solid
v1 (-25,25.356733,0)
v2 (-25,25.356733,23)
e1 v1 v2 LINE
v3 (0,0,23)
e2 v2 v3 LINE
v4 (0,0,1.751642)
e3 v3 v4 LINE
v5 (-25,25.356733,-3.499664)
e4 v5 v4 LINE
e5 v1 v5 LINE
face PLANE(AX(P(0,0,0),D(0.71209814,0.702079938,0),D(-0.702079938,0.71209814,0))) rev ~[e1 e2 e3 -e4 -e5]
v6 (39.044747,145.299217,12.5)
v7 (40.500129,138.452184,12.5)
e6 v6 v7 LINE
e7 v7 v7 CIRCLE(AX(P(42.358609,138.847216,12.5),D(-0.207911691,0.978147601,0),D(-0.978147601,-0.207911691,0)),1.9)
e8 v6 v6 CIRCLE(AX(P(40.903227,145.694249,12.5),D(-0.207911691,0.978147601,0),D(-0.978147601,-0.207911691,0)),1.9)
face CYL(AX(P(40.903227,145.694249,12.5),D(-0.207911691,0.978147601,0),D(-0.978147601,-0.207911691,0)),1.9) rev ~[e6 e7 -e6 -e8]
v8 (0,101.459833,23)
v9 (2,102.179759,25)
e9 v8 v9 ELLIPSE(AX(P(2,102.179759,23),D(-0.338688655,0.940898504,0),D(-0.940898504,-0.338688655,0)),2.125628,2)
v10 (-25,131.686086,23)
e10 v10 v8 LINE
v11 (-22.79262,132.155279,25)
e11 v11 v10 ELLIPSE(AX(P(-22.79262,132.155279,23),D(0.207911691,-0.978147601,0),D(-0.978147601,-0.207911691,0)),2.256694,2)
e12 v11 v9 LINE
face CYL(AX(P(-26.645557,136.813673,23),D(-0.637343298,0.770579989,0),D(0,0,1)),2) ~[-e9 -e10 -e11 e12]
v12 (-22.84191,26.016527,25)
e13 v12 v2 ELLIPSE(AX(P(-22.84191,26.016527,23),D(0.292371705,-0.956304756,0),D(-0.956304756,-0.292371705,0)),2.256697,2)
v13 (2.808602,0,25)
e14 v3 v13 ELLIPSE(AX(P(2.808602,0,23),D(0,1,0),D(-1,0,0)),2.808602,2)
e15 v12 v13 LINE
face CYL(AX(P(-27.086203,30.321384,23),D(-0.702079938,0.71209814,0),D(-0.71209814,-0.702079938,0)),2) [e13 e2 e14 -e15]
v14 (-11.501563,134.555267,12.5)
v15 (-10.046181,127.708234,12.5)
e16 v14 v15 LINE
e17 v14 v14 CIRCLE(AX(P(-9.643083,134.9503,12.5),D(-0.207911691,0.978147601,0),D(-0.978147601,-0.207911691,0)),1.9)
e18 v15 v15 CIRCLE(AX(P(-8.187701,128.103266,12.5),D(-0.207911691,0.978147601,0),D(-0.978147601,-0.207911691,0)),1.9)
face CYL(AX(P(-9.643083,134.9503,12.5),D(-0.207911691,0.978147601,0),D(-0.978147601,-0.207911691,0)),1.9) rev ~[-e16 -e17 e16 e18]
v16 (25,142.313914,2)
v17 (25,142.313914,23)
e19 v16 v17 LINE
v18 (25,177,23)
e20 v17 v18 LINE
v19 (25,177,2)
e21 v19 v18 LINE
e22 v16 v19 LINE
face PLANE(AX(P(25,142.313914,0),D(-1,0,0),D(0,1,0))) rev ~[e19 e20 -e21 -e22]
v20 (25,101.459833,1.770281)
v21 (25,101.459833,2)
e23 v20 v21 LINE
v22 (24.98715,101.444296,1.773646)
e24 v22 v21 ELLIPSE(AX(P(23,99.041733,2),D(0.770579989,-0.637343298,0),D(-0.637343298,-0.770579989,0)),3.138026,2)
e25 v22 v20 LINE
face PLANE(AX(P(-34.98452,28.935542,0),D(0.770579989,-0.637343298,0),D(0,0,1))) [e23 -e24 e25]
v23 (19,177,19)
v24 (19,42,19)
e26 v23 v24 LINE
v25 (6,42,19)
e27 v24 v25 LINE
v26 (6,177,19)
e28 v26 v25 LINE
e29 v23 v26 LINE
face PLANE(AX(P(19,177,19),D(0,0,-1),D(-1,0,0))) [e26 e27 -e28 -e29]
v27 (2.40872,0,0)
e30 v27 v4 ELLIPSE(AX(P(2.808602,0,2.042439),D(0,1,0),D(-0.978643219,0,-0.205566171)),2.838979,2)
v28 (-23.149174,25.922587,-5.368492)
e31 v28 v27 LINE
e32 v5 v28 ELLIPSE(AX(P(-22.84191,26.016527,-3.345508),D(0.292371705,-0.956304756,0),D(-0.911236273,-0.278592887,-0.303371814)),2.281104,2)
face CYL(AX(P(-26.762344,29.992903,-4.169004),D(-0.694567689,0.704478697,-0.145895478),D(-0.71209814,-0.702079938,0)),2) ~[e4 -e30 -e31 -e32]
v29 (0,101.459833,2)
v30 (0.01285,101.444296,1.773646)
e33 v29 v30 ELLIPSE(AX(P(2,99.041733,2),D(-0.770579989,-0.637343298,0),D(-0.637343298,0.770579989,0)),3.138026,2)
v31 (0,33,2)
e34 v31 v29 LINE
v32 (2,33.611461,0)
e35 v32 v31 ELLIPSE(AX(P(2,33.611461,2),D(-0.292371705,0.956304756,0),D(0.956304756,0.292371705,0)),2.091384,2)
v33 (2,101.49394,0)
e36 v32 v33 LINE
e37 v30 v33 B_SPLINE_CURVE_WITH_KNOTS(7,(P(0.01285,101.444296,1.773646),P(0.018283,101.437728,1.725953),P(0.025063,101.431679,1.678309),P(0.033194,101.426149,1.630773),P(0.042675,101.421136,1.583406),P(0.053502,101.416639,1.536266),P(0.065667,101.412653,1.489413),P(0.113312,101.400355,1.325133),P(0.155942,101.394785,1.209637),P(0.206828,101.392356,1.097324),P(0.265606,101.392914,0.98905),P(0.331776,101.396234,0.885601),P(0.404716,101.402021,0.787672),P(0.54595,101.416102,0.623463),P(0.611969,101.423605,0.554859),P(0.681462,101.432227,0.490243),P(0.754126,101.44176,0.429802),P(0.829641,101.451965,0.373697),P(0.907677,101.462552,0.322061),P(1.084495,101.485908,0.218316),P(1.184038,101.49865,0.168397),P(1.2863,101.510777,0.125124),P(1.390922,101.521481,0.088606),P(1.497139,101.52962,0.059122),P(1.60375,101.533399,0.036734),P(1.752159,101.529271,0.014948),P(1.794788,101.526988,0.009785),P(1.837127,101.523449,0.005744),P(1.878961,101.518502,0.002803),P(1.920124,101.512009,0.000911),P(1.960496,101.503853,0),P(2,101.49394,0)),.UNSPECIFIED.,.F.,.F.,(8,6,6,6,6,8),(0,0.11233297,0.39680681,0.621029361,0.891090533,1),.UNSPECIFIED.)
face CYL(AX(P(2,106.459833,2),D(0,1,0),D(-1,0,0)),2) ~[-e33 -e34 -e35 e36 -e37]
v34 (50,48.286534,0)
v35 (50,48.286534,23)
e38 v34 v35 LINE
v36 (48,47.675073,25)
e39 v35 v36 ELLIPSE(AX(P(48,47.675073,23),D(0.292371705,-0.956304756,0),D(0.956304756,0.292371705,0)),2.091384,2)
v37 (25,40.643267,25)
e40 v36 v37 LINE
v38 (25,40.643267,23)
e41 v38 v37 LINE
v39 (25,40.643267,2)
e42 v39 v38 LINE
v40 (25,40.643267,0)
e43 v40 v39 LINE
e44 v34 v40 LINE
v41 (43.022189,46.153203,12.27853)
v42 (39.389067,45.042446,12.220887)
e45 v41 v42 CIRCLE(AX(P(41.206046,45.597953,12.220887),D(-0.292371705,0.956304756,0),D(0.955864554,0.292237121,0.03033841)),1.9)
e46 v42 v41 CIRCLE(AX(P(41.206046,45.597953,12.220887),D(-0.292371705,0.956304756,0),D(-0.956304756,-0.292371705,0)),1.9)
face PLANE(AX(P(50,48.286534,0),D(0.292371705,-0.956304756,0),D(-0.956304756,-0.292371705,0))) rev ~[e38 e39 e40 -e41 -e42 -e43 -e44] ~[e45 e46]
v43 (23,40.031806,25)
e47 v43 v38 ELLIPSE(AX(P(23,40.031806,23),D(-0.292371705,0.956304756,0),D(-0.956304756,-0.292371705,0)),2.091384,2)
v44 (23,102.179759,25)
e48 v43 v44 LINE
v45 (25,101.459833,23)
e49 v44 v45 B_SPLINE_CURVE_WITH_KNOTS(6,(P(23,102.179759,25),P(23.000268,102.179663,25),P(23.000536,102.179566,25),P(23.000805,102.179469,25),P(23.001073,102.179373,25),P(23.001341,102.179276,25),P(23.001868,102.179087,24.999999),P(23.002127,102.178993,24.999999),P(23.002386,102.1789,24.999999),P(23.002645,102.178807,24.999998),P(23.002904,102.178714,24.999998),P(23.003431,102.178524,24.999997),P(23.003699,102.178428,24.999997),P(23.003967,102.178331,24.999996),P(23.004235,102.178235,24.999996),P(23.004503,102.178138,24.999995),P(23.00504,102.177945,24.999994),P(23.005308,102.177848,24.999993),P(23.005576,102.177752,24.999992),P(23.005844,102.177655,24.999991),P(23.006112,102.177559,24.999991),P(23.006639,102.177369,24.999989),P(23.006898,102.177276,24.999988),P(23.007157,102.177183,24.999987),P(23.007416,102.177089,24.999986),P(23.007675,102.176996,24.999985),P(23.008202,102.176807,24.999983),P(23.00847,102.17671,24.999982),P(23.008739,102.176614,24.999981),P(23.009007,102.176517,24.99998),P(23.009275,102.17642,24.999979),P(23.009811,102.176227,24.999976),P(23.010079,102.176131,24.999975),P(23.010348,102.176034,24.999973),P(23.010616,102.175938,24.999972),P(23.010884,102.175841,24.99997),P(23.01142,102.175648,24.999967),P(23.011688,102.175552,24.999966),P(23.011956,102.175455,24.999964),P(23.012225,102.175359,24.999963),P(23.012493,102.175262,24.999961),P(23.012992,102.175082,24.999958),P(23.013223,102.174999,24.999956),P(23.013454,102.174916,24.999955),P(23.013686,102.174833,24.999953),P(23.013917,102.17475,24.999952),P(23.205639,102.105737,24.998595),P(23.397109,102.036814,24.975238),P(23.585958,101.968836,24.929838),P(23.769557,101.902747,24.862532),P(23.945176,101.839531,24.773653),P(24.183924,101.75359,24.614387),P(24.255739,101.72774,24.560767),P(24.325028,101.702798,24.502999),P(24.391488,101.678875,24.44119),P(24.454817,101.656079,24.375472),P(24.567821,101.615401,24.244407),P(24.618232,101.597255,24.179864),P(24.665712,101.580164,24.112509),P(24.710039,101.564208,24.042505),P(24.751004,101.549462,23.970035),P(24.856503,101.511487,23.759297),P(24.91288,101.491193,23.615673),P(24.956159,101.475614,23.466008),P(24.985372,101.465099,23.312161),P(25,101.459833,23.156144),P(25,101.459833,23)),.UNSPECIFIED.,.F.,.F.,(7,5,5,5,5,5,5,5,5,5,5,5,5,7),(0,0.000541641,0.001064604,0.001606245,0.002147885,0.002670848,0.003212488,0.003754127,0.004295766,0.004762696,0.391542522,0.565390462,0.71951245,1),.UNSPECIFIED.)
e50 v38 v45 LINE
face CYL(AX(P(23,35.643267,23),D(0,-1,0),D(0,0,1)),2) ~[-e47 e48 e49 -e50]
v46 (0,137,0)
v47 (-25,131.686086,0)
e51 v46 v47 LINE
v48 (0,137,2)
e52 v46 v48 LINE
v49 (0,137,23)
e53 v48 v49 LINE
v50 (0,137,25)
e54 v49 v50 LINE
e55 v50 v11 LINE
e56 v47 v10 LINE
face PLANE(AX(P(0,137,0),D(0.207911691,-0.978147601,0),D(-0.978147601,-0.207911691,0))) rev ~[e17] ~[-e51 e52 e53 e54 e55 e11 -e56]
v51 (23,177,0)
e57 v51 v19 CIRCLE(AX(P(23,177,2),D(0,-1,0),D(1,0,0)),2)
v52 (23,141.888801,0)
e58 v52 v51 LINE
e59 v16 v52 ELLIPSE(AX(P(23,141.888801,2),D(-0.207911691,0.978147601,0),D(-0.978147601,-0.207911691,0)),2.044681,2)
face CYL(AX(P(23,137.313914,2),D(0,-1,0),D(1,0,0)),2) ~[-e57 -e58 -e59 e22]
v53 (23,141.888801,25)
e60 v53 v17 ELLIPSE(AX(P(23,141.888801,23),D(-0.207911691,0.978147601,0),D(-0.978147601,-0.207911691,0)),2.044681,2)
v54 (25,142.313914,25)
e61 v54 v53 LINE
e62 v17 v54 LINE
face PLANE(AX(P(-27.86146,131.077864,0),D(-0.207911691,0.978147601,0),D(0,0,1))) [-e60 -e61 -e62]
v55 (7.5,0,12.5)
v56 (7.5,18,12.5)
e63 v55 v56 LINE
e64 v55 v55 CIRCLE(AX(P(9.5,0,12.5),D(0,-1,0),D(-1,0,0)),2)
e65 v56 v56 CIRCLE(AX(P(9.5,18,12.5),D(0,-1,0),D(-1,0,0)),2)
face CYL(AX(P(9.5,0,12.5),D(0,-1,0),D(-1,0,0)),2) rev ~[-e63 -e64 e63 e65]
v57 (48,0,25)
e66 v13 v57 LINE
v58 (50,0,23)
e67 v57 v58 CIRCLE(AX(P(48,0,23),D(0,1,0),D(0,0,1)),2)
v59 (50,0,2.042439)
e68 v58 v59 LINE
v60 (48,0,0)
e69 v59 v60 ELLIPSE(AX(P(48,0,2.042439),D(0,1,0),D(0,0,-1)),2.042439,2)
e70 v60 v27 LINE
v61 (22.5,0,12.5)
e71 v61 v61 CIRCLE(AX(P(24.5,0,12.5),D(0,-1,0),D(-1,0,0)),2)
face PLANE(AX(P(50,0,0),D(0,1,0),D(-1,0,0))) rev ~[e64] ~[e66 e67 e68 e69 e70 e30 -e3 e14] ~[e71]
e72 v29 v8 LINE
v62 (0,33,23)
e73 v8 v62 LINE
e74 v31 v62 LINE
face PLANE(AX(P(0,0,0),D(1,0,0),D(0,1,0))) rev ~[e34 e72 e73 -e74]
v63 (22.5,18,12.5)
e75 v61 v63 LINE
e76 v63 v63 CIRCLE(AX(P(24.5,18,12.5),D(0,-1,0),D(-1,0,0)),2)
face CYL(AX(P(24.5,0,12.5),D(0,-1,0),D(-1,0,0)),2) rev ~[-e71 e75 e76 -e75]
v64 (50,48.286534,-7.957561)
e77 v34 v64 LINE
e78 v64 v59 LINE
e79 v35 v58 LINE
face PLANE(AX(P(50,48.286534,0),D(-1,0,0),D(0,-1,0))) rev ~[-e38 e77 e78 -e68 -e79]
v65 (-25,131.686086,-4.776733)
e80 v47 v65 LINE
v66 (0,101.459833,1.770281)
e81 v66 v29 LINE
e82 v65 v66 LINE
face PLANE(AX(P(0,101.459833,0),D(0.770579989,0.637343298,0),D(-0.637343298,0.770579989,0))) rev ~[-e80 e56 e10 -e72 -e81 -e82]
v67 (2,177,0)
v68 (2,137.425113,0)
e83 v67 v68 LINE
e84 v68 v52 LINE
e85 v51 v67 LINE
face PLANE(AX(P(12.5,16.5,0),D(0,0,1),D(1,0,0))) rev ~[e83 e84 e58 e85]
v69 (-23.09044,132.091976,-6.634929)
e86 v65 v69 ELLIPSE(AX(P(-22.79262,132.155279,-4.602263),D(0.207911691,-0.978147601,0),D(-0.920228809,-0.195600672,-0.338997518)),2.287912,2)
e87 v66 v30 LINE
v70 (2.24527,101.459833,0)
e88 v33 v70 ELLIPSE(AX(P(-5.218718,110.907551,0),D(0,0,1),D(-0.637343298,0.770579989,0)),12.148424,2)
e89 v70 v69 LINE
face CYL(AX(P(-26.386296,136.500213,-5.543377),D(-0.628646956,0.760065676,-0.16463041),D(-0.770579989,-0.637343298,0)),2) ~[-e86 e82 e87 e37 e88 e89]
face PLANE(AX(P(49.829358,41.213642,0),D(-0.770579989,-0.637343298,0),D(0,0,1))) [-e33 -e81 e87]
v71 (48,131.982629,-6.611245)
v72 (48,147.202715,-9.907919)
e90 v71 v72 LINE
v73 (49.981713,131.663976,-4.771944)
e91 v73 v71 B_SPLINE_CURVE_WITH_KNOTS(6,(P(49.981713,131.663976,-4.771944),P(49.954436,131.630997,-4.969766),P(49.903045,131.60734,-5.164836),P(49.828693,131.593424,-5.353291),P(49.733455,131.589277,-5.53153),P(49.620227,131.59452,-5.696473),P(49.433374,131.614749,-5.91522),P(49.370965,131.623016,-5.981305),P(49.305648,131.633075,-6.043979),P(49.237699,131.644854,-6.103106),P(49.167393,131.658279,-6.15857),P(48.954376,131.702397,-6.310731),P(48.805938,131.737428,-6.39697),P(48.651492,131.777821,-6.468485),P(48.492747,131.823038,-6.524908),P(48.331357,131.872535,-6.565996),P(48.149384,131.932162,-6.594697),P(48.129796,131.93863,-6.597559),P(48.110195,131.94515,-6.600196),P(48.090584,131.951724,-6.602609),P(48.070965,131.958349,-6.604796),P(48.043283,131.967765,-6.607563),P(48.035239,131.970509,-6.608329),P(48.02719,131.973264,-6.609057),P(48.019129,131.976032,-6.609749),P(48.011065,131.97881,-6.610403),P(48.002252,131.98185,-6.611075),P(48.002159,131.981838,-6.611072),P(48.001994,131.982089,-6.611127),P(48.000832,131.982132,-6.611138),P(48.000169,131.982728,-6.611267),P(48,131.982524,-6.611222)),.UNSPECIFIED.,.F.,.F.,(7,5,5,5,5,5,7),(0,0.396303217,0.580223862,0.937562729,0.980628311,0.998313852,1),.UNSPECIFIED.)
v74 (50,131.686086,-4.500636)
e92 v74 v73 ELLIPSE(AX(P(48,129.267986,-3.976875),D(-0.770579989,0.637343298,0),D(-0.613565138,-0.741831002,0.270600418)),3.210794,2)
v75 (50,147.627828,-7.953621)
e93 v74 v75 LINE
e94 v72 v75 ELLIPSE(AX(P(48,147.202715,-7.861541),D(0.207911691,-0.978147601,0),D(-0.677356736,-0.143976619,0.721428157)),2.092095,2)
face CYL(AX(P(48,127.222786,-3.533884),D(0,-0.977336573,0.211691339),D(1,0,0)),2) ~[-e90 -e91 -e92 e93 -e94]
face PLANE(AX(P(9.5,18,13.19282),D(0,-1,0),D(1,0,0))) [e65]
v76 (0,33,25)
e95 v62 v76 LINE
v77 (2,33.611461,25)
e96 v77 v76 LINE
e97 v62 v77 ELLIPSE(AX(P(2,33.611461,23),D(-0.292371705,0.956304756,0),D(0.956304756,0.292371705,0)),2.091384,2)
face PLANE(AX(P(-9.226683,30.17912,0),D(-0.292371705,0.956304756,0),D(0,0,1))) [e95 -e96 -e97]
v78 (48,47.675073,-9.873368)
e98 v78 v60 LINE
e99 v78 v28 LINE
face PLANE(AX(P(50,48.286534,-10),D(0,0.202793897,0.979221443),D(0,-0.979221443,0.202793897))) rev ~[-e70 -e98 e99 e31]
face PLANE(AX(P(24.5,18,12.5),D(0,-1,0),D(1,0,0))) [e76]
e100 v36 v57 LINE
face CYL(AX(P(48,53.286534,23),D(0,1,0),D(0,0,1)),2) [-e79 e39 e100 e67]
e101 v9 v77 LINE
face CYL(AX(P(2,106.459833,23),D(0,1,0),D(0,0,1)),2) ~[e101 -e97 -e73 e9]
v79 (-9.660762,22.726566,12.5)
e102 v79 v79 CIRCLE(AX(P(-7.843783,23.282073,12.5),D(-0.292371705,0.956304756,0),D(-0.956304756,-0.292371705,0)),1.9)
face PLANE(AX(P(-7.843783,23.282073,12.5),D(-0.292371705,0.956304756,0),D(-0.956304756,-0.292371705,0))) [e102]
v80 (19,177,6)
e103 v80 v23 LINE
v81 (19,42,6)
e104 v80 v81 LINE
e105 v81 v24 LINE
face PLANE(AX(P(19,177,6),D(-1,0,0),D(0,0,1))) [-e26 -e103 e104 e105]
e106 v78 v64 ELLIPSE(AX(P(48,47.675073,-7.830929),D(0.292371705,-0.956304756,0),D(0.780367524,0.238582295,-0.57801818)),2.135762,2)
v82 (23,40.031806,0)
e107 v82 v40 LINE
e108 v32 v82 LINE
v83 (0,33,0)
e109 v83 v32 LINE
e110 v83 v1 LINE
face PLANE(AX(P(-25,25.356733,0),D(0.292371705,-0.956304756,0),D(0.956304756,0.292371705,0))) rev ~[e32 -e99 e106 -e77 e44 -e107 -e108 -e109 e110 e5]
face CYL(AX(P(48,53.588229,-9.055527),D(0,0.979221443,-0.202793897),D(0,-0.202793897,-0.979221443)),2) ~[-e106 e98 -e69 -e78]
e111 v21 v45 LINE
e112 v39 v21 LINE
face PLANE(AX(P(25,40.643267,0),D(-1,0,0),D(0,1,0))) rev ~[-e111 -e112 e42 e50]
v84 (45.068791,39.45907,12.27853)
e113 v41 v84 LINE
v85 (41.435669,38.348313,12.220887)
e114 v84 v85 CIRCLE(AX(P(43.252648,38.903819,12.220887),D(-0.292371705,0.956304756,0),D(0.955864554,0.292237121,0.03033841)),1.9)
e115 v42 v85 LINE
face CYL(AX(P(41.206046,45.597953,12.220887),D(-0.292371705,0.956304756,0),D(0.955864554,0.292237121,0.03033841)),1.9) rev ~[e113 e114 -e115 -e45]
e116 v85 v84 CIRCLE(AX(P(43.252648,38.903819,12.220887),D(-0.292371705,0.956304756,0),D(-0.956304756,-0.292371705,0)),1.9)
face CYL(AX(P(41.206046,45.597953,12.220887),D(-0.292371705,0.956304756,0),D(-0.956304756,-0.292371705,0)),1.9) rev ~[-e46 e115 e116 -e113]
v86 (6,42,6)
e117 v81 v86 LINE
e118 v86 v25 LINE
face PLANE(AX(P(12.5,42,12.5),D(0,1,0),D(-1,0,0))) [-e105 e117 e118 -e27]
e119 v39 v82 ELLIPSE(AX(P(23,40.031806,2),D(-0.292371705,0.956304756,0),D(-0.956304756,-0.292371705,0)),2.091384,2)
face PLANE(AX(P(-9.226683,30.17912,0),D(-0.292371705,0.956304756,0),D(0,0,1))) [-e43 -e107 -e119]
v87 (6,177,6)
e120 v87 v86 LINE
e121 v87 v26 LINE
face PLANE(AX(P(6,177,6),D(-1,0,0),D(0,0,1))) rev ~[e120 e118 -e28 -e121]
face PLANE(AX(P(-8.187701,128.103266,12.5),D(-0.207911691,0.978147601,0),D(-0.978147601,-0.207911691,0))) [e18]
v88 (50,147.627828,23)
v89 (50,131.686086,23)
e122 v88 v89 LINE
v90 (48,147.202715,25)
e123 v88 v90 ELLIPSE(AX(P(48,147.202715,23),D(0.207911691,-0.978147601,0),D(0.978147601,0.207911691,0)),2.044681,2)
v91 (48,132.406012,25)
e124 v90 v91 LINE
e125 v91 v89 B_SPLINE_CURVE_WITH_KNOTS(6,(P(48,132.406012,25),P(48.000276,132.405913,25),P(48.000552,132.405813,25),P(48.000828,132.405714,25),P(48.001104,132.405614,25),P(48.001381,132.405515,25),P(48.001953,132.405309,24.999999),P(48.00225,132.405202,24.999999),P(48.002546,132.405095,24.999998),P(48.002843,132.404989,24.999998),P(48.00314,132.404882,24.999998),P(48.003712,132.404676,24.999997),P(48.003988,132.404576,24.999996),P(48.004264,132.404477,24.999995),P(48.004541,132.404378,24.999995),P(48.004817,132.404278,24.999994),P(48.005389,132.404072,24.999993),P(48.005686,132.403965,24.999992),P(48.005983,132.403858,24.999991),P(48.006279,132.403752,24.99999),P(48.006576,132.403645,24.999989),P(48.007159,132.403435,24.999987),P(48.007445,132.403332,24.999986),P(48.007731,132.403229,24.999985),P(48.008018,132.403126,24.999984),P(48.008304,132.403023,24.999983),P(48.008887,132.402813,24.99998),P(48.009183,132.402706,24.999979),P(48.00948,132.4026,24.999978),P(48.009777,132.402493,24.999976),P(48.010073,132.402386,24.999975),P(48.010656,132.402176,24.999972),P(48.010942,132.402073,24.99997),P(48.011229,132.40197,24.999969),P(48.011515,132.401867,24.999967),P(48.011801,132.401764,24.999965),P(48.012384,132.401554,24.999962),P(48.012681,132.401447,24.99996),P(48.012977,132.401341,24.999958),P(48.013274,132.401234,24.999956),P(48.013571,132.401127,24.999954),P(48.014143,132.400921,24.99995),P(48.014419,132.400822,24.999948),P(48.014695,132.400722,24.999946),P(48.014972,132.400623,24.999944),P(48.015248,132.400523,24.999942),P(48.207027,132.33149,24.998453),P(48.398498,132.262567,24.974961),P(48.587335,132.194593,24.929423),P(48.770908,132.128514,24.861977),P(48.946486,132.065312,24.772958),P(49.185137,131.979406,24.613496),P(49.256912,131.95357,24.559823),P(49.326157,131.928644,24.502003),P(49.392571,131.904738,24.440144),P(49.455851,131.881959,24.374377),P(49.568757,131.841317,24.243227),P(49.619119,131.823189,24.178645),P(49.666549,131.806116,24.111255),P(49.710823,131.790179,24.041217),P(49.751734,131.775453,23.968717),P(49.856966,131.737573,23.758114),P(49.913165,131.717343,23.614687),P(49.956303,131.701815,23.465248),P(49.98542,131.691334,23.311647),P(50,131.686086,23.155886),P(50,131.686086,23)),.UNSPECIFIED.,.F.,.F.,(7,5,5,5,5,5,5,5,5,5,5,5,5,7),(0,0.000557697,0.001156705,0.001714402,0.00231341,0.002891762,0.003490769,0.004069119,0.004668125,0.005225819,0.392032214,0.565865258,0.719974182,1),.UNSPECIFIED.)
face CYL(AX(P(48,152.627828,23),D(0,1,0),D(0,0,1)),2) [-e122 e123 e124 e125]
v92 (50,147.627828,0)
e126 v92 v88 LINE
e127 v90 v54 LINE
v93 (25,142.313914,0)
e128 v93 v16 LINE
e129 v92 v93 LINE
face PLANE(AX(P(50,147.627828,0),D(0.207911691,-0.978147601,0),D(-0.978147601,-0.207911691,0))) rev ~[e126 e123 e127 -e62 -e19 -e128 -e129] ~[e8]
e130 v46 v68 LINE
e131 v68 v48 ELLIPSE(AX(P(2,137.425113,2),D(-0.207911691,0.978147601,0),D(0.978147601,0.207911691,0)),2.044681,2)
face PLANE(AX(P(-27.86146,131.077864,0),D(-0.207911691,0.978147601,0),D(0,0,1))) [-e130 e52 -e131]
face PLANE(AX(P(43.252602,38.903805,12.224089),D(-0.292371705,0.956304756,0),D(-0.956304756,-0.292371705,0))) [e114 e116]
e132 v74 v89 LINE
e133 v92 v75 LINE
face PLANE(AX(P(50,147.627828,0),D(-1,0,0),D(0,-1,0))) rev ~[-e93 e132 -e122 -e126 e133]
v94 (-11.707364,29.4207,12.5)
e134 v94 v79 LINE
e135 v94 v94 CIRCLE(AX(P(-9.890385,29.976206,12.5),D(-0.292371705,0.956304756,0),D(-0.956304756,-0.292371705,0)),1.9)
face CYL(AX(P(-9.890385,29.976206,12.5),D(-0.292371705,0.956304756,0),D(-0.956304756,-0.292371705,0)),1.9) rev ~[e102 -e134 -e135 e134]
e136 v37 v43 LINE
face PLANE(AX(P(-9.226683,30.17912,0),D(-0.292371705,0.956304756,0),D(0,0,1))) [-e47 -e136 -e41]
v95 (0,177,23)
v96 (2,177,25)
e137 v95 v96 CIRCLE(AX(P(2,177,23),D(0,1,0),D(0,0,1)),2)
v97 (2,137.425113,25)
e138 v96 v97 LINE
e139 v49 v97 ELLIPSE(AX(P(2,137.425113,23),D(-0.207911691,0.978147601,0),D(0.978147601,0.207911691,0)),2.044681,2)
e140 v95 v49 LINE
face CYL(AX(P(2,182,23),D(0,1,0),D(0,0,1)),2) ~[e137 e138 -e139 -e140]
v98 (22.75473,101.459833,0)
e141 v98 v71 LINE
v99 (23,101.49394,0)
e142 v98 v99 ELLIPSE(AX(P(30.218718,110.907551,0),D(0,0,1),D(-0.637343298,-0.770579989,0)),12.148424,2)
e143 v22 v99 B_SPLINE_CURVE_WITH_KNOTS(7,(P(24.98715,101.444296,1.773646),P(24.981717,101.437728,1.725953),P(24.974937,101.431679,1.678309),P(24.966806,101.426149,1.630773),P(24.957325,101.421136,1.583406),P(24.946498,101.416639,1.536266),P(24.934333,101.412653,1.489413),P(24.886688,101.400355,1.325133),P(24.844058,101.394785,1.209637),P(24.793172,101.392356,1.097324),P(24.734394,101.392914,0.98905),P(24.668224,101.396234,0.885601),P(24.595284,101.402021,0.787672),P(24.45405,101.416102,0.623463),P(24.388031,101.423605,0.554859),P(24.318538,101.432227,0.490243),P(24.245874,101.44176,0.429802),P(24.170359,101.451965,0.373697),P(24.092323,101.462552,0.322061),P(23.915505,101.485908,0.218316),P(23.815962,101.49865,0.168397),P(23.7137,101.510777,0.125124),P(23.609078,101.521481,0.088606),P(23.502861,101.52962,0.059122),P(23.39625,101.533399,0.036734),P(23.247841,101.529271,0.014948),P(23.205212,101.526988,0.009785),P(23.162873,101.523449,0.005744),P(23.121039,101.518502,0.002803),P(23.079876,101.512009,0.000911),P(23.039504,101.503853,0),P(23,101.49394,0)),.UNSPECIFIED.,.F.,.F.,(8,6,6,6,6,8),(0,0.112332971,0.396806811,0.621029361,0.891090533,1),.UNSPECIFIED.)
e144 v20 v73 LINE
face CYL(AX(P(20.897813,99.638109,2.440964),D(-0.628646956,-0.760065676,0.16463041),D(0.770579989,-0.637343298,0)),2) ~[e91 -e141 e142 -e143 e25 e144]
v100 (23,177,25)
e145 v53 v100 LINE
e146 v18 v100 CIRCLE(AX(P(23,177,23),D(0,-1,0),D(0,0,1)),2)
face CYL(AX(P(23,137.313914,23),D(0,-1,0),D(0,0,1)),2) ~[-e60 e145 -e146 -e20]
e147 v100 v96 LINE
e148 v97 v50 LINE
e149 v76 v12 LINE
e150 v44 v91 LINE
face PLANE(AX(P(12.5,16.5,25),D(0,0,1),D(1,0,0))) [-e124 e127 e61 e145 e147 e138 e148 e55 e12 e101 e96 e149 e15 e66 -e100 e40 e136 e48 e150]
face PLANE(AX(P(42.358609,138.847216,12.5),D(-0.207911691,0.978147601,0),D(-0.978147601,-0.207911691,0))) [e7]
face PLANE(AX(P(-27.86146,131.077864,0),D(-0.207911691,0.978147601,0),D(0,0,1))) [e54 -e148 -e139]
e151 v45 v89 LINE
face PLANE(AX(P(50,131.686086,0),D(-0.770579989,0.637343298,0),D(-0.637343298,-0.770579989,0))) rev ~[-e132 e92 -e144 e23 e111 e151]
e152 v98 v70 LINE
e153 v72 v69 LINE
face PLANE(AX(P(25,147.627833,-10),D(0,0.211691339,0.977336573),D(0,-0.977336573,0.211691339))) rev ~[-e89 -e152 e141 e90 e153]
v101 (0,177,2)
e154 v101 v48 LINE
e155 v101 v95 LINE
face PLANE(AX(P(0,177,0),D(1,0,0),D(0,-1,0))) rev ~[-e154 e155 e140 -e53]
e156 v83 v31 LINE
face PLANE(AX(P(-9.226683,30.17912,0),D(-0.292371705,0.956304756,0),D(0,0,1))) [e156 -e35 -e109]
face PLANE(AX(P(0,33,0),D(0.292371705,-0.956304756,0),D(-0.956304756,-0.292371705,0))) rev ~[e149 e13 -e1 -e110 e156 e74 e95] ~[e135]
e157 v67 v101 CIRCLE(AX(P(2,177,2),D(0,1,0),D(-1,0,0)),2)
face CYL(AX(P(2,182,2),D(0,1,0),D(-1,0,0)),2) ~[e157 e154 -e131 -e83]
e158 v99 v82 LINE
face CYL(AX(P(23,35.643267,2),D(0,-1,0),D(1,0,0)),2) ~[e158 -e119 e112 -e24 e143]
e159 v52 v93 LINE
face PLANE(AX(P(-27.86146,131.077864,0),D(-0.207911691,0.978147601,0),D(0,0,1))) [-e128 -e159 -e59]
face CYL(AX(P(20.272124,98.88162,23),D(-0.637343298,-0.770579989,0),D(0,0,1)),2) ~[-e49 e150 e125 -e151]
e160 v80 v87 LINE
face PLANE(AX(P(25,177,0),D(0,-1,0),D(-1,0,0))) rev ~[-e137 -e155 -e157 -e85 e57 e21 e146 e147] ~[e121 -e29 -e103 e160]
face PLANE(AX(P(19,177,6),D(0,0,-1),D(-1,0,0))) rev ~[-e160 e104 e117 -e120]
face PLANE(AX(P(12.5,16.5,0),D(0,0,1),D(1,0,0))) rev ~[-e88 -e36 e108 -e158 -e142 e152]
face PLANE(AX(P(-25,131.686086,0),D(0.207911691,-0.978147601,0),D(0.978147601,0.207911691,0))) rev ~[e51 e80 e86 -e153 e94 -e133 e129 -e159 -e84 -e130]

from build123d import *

# Parameters (mm, degrees)
F0_W           = 25
F0_H           = 33
F1_DEPTH       = 25
F3_DEPTH       = 10
F5_DEPTH       = 81.7
F7_DEPTH       = 10
F9_DEPTH       = 92
F10_W          = 13
F10_H          = 13
F11_DEPTH      = 135
F12_R          = 1.9
F13_DEPTH      = 7
F14_R          = 1.9
F15_DEPTH      = 7
F17_DEPTH      = 18
F18_T1_DEPTH   = 26.3114146799
F18_T3_DEPTH   = 25.9417421253
F18_T5_DEPTH   = 59.3111485648
F18_T7_DEPTH   = 58.2865340729
F18_T9_DEPTH   = 45.6084808239
F18_T11_DEPTH  = 44.6581070284
F18_T16_DEPTH  = 49.2253281189
F18_T21_DEPTH  = 48.4985768834
F18_T27_DEPTH  = 48.4985768834
F18_T33_DEPTH  = 48.4985768834
F18_T39_DEPTH  = 48.4985768834
F18_T45_DEPTH  = 48.4985768834
F18_T51_DEPTH  = 48.4985768834
F18_T57_DEPTH  = 49.2253281189
F18_T62_DEPTH  = 70.8165659944
F18_T69_DEPTH  = 70.8165659944
F18_T75_DEPTH  = 70.8165659944
F18_T81_DEPTH  = 70.8165659944
F18_T87_DEPTH  = 78.4598330308
F18_T93_DEPTH  = 78.4598330308
F18_T99_DEPTH  = 78.4598330308
F18_T106_DEPTH = 78.4598330308
F18_T112_DEPTH = 50
F18_T117_DEPTH = 50
F18_T122_DEPTH = 44.6860859582
F18_T127_DEPTH = 44.6860859582
F18_T133_DEPTH = 70.8165659944
F18_T137_DEPTH = 49.2253281189
F18_T144_DEPTH = 70.8165659944
F18_T149_DEPTH = 48.4985768834
F18_T157_DEPTH = 48.4985768834
F18_T162_DEPTH = 78.4598330308
F18_T170_DEPTH = 49.2253281189
F18_T174_DEPTH = 78.4598330308


# Not quite as in the source:
# - a fillet or chamfer that OpenCascade refuses, or shapes differently, is made with other operations: its cross-section is extruded or revolved along the edge and cut away or added


with BuildPart() as f1:
    # F0 (on Top) → F1 (new body)
    with BuildSketch(Plane.XY):
        with Locations((12.5, 16.5)):
            Rectangle(F0_W, F0_H)
        Polygon((-25, 25.3567329635), (0, 0), (0, 33), align=None)
        with Locations((37.5, 16.5)):
            Rectangle(F0_W, F0_H)
        Polygon((25, 40.6432670365), (0, 33), (25, 33), align=None)
        Polygon((0, 101.4598330308), (0, 33), (25, 40.6432670365), (25, 101.4598330308), (25, 137), (0, 137), align=None)
        Polygon((25, 40.6432670365), (25, 33), (50, 33), (50, 48.2865340729), align=None)
        Polygon((-25, 131.6860859582), (0, 101.4598330308), (0, 137), align=None)
        Polygon((25, 137), (25, 101.4598330308), (50, 131.6860859582), (50, 147.6278280835), (25, 142.3139140418), align=None)
        Polygon((25, 142.3139140418), (0, 137), (25, 137), align=None)
        Polygon((0, 177), (0, 137), (25, 142.3139140418), (25, 177), align=None)
    extrude(amount=F1_DEPTH)

    # F2 (on face) → F3 (join)
    with BuildSketch(Plane(origin=(0, 0, 0), x_dir=(1, 0, 0), z_dir=(0, 0, -1))):
        Polygon((50, -131.6860859582), (25, -101.4598330308), (0, -101.4598330308), (-25, -131.6860859582), (50, -147.6278280835), align=None)
    extrude(amount=F3_DEPTH)

    # F4 (on face) → F5 (cut, symmetric)
    with BuildSketch(Plane.YZ.offset(25)):
        Polygon((101.4598330308, -21.1370438337), (147.6278330308, -10), (101.4598330308, 0), align=None)
    extrude(amount=F5_DEPTH, both=True, mode=Mode.SUBTRACT)

    # F6 (on face) → F7 (join)
    with BuildSketch(Plane(origin=(0, 0, 0), x_dir=(1, 0, 0), z_dir=(0, 0, -1))):
        Polygon((50, -48.2865340729), (50, 0), (0, 0), (-25, -25.3567329635), align=None)
    extrude(amount=F7_DEPTH)

    # F8 (on face) → F9 (cut)
    with BuildSketch(Plane.YZ.offset(50)):
        Polygon((48.2865340729, -10), (0, 0), (0, -39.534393698), (48.2865340729, -39.534393698), align=None)
    extrude(amount=-F9_DEPTH, mode=Mode.SUBTRACT)

    # F10 (on face) → F11 (cut)
    with BuildSketch(Plane(origin=(0, 177, 0), x_dir=(-1, 0, 0), z_dir=(0, 1, 0))):
        with Locations((-12.5, 12.5)):
            Rectangle(F10_W, F10_H)
    extrude(amount=-F11_DEPTH, mode=Mode.SUBTRACT)

    # F12 (on face) → F13 (cut)
    with BuildSketch(Plane(origin=(-27.8614600507, 131.0778638485, 0), x_dir=(-0.9781476007, -0.2079116908, 0), z_dir=(-0.2079116908, 0.9781476007, 0))):
        with Locations((-18.6253867704, 12.5)):
            Circle(F12_R)
        with BuildLine():
            ThreePointArc((-72.2009313853, 12.5), (-70.3009313853, 10.6), (-68.4009313853, 12.5))
            ThreePointArc((-68.4009313853, 12.5), (-70.3009313853, 14.4), (-72.2009313853, 12.5))
        make_face()
    extrude(amount=-F13_DEPTH, mode=Mode.SUBTRACT)

    # F14 (on face) → F15 (cut)
    with BuildSketch(Plane(origin=(-9.2266829073, 30.1791199472, 0), x_dir=(-0.956304756, -0.2923717047, 0), z_dir=(-0.2923717047, 0.956304756, 0))):
        with Locations((0.6940276563, 12.5)):
            Circle(F14_R)
        with BuildLine():
            ThreePointArc((-54.6362143833, 12.2785296088), (-52.7659137894, 10.3211052927), (-50.8370889828, 12.2208866302))
            ThreePointArc((-50.8370889828, 12.2208866302), (-52.7082641762, 14.1206679678), (-54.6362143833, 12.2785296088))
        make_face()
    extrude(amount=-F15_DEPTH, mode=Mode.SUBTRACT)

    # F16 (on face) → F17 (cut)
    with BuildSketch(Plane.XZ):
        with BuildLine():
            ThreePointArc((11.5, 12.5), (9.5, 14.5), (7.5, 12.5))
            Line((7.5, 12.5), (9.5, 12.5))
            Line((9.5, 12.5), (11.5, 12.5))
        make_face()
        with BuildLine():
            ThreePointArc((26.5, 12.5), (24.5, 14.5), (22.5, 12.5))
            ThreePointArc((22.5, 12.5), (24.5, 10.5), (26.5, 12.5))
        make_face()
        with BuildLine():
            Line((9.5, 12.5), (7.5, 12.5))
            ThreePointArc((7.5, 12.5), (9.5, 10.5), (11.5, 12.5))
            Line((11.5, 12.5), (9.5, 12.5))
        make_face()
    extrude(amount=-F17_DEPTH, mode=Mode.SUBTRACT)

    # F18: fillet of radius 2 on 18 edges, made by hand

    # F18_s2 → F18_t1 (cut)
    with BuildSketch(Plane(origin=(0, 122.2526609766, -26.4799560251), x_dir=(1, 0, 0), z_dir=(0, 0.9773365731, -0.2116913388))):
        with BuildLine():
            ThreePointArc((50, -23.478167891), (49.4142135624, -22.0639543286), (48, -21.478167891))
            Line((48, -21.478167891), (50, -21.478167891))
            Line((50, -21.478167891), (50, -23.478167891))
        make_face()
    extrude(amount=F18_T1_DEPTH, mode=Mode.SUBTRACT)

    # F18_s4 → F18_t3 (cut)
    with BuildSketch(Plane.XZ.offset(-152.6278280835)):
        with BuildLine():
            ThreePointArc((48, 25), (49.4142135624, 24.4142135624), (50, 23))
            Line((50, 23), (50, 25))
            Line((50, 25), (48, 25))
        make_face()
    extrude(amount=F18_T3_DEPTH, mode=Mode.SUBTRACT)

    # F18_s6 → F18_t5 (cut)
    with BuildSketch(Plane(origin=(0, 53.1826412899, -11.0139694867), x_dir=(1, 0, 0), z_dir=(0, -0.9792214434, 0.2027938973))):
        with BuildLine():
            ThreePointArc((48, 0), (49.4142135624, 0.5857864376), (50, 2))
            Line((50, 2), (50, 0))
            Line((50, 0), (48, 0))
        make_face()
    extrude(amount=F18_T5_DEPTH, mode=Mode.SUBTRACT)

    # F18_s8 → F18_t7 (cut)
    with BuildSketch(Plane.XZ.offset(-53.2865340729)):
        with BuildLine():
            ThreePointArc((48, 25), (49.4142135624, 24.4142135624), (50, 23))
            Line((50, 23), (50, 25))
            Line((50, 25), (48, 25))
        make_face()
    extrude(amount=F18_T7_DEPTH, mode=Mode.SUBTRACT)

    # F18_s10 → F18_t9 (cut)
    with BuildSketch(Plane(origin=(-28.5103996887, 28.9172236636, 0), x_dir=(0, 0, 1), z_dir=(0.7020799377, -0.71209814, 0))):
        with BuildLine():
            ThreePointArc((23, 0), (24.4142135624, -0.5857864376), (25, -2))
            Line((25, -2), (25, 0))
            Line((25, 0), (23, 0))
        make_face()
    extrude(amount=F18_T9_DEPTH, mode=Mode.SUBTRACT)

    # F18_s12 → F18_t11 (cut)
    with BuildSketch(Plane(origin=(-28.0090391043, 28.4087090053, -5.8833605581), x_dir=(0.71209814, 0.7020799377, 0), z_dir=(0.6945676893, -0.7044786969, 0.145895478))):
        with BuildLine():
            ThreePointArc((0, 1.7328989819), (0.4884593774, 0.4232253789), (1.7152449464, -0.2467258713))
            Line((1.7152449464, -0.2467258713), (0, 0))
            Line((0, 0), (0, 1.7328989819))
        make_face()
    extrude(amount=F18_T11_DEPTH, mode=Mode.SUBTRACT)


with BuildPart() as f18_tool14:
    # F18_s15 → F18_t16 (new body)
    with BuildSketch(Plane(origin=(56.7978037382, 68.6713912604, 0), x_dir=(0, 0, 1), z_dir=(0.6373432983, 0.7705799894, 0))):
        with BuildLine():
            ThreePointArc((25, -47.4002448925), (24.4142135624, -45.9860313302), (23, -45.4002448925))
            Line((23, -45.4002448925), (25, -45.4002448925))
            Line((25, -45.4002448925), (25, -47.4002448925))
        make_face()
    extrude(amount=F18_T16_DEPTH)

    split(bisect_by=Plane.YZ.offset(25), keep=Keep.TOP)


with BuildPart() as f1_1:
    add(f1.part)

    # F18_t13: cut F18_tool14
    add(f18_tool14.part, mode=Mode.SUBTRACT)


with BuildPart() as f18_tool19:
    # F18_s20 → F18_t21 (new body)
    with BuildSketch(Plane(origin=(55.6145080943, 67.2407275237, -14.5643578937), x_dir=(-0.7705799894, 0.6373432983, 0), z_dir=(0.6286469564, 0.7600656763, -0.1646304099))):
        with BuildLine():
            ThreePointArc((45.4002448925, 17.2405635017), (45.8936460368, 15.9252080791), (47.1304047803, 15.258850527))
            Line((47.1304047803, 15.258850527), (45.4002448925, 15.4944378922))
            Line((45.4002448925, 15.4944378922), (45.4002448925, 17.2405635017))
        make_face()
    extrude(amount=F18_T21_DEPTH)

    split(bisect_by=Plane.YZ.offset(25), keep=Keep.BOTTOM)

    split(bisect_by=Plane.XY, keep=Keep.BOTTOM)


with BuildPart() as f1_2:
    add(f1_1.part)

    # F18_t18: cut F18_tool19
    add(f18_tool19.part, mode=Mode.SUBTRACT)


with BuildPart() as f18_tool25:
    # F18_s26 → F18_t27 (new body)
    with BuildSketch(Plane(origin=(55.6145080943, 67.2407275237, -14.5643578937), x_dir=(-0.7705799894, 0.6373432983, 0), z_dir=(0.6286469564, 0.7600656763, -0.1646304099))):
        with BuildLine():
            ThreePointArc((45.4002448925, 17.2405635017), (45.8936460368, 15.9252080791), (47.1304047803, 15.258850527))
            Line((47.1304047803, 15.258850527), (45.4002448925, 15.4944378922))
            Line((45.4002448925, 15.4944378922), (45.4002448925, 17.2405635017))
        make_face()
    extrude(amount=F18_T27_DEPTH)

    split(bisect_by=Plane.YZ.offset(25), keep=Keep.TOP)

    split(bisect_by=Plane.XY, keep=Keep.TOP)


with BuildPart() as f1_3:
    add(f1_2.part)

    # F18_t24: cut F18_tool25
    add(f18_tool25.part, mode=Mode.SUBTRACT)


with BuildPart() as f18_tool31:
    # F18_s32 → F18_t33 (new body)
    with BuildSketch(Plane(origin=(55.6145080943, 67.2407275237, -14.5643578937), x_dir=(-0.7705799894, 0.6373432983, 0), z_dir=(0.6286469564, 0.7600656763, -0.1646304099))):
        with BuildLine():
            ThreePointArc((45.4002448925, 17.2405635017), (45.8936460368, 15.9252080791), (47.1304047803, 15.258850527))
            Line((47.1304047803, 15.258850527), (45.4002448925, 15.4944378922))
            Line((45.4002448925, 15.4944378922), (45.4002448925, 17.2405635017))
        make_face()
    extrude(amount=F18_T33_DEPTH)

    split(bisect_by=Plane.YZ.offset(25), keep=Keep.TOP)

    split(bisect_by=Plane.XY, keep=Keep.BOTTOM)


with BuildPart() as f1_4:
    add(f1_3.part)

    # F18_t30: cut F18_tool31
    add(f18_tool31.part, mode=Mode.SUBTRACT)


with BuildPart() as f18_tool37:
    # F18_s38 → F18_t39 (new body)
    with BuildSketch(Plane(origin=(-76.2230659478, 92.1575068097, -19.9613383317), x_dir=(0.7705799894, 0.6373432983, 0), z_dir=(0.6286469564, -0.7600656763, 0.1646304099))):
        with BuildLine():
            ThreePointArc((64.6647446284, 14.617411291), (65.1581457726, 13.3020558683), (66.3949045162, 12.6356983163))
            Line((66.3949045162, 12.6356983163), (64.6647446284, 12.8712856815))
            Line((64.6647446284, 12.8712856815), (64.6647446284, 14.617411291))
        make_face()
    extrude(amount=F18_T39_DEPTH)

    split(bisect_by=Plane.YZ, keep=Keep.BOTTOM)

    split(bisect_by=Plane.XY, keep=Keep.BOTTOM)


with BuildPart() as f1_5:
    add(f1_4.part)

    # F18_t36: cut F18_tool37
    add(f18_tool37.part, mode=Mode.SUBTRACT)


with BuildPart() as f18_tool43:
    # F18_s44 → F18_t45 (new body)
    with BuildSketch(Plane(origin=(-76.2230659478, 92.1575068097, -19.9613383317), x_dir=(0.7705799894, 0.6373432983, 0), z_dir=(0.6286469564, -0.7600656763, 0.1646304099))):
        with BuildLine():
            ThreePointArc((64.6647446284, 14.617411291), (65.1581457726, 13.3020558683), (66.3949045162, 12.6356983163))
            Line((66.3949045162, 12.6356983163), (64.6647446284, 12.8712856815))
            Line((64.6647446284, 12.8712856815), (64.6647446284, 14.617411291))
        make_face()
    extrude(amount=F18_T45_DEPTH)

    split(bisect_by=Plane.YZ, keep=Keep.TOP)

    split(bisect_by=Plane.XY, keep=Keep.BOTTOM)


with BuildPart() as f1_6:
    add(f1_5.part)

    # F18_t42: cut F18_tool43
    add(f18_tool43.part, mode=Mode.SUBTRACT)


with BuildPart() as f18_tool49:
    # F18_s50 → F18_t51 (new body)
    with BuildSketch(Plane(origin=(-76.2230659478, 92.1575068097, -19.9613383317), x_dir=(0.7705799894, 0.6373432983, 0), z_dir=(0.6286469564, -0.7600656763, 0.1646304099))):
        with BuildLine():
            ThreePointArc((64.6647446284, 14.617411291), (65.1581457726, 13.3020558683), (66.3949045162, 12.6356983163))
            Line((66.3949045162, 12.6356983163), (64.6647446284, 12.8712856815))
            Line((64.6647446284, 12.8712856815), (64.6647446284, 14.617411291))
        make_face()
    extrude(amount=F18_T51_DEPTH)

    split(bisect_by=Plane.YZ, keep=Keep.BOTTOM)

    split(bisect_by=Plane.XY, keep=Keep.TOP)


with BuildPart() as f1_7:
    add(f1_6.part)

    # F18_t48: cut F18_tool49
    add(f18_tool49.part, mode=Mode.SUBTRACT)


with BuildPart() as f18_tool55:
    # F18_s56 → F18_t57 (new body)
    with BuildSketch(Plane(origin=(-78.016074724, 94.3253442805, 0), x_dir=(0, 0, 1), z_dir=(0.6373432983, -0.7705799894, 0))):
        with BuildLine():
            ThreePointArc((25, -66.6647446284), (24.4142135624, -65.250531066), (23, -64.6647446284))
            Line((23, -64.6647446284), (25, -64.6647446284))
            Line((25, -64.6647446284), (25, -66.6647446284))
        make_face()
    extrude(amount=F18_T57_DEPTH)

    split(bisect_by=Plane.YZ, keep=Keep.BOTTOM)


with BuildPart() as f1_8:
    add(f1_7.part)

    # F18_t54: cut F18_tool55
    add(f18_tool55.part, mode=Mode.SUBTRACT)


with BuildPart() as f18_tool60:
    # F18_s61 → F18_t62 (new body)
    with BuildSketch(Plane.XZ.offset(-35.6432670365)):
        with BuildLine():
            ThreePointArc((25, 2), (24.4142135624, 0.5857864376), (23, 0))
            Line((23, 0), (25, 0))
            Line((25, 0), (25, 2))
        make_face()
    extrude(amount=-F18_T62_DEPTH)

    split(bisect_by=Plane(origin=(-9.2266829073, 30.1791199472, 0), x_dir=(0, 0, 1), z_dir=(-0.2923717047, 0.956304756, 0)), keep=Keep.TOP)

    split(bisect_by=Plane(origin=(-34.9845202296, 28.9355418232, 0), x_dir=(0, 0, 1), z_dir=(0.7705799894, -0.6373432983, 0)), keep=Keep.TOP)

    split(bisect_by=Plane(origin=(0, 4.5467421163, 20.9913990025), x_dir=(1, 0, 0), z_dir=(0, -0.2116913388, -0.9773365731)), keep=Keep.TOP)


with BuildPart() as f1_9:
    add(f1_8.part)

    # F18_t59: cut F18_tool60
    add(f18_tool60.part, mode=Mode.SUBTRACT)


with BuildPart() as f18_tool67:
    # F18_s68 → F18_t69 (new body)
    with BuildSketch(Plane.XZ.offset(-35.6432670365)):
        with BuildLine():
            ThreePointArc((25, 2), (24.4142135624, 0.5857864376), (23, 0))
            Line((23, 0), (25, 0))
            Line((25, 0), (25, 2))
        make_face()
    extrude(amount=-F18_T69_DEPTH)

    split(bisect_by=Plane(origin=(-34.9845202296, 28.9355418232, 0), x_dir=(0, 0, 1), z_dir=(-0.7705799894, 0.6373432983, 0)), keep=Keep.TOP)

    split(bisect_by=Plane(origin=(0, 4.5467421163, 20.9913990025), x_dir=(1, 0, 0), z_dir=(0, -0.2116913388, -0.9773365731)), keep=Keep.TOP)


with BuildPart() as f1_10:
    add(f1_9.part)

    # F18_t66: cut F18_tool67
    add(f18_tool67.part, mode=Mode.SUBTRACT)


with BuildPart() as f18_tool73:
    # F18_s74 → F18_t75 (new body)
    with BuildSketch(Plane.XZ.offset(-35.6432670365)):
        with BuildLine():
            ThreePointArc((25, 2), (24.4142135624, 0.5857864376), (23, 0))
            Line((23, 0), (25, 0))
            Line((25, 0), (25, 2))
        make_face()
    extrude(amount=-F18_T75_DEPTH)

    split(bisect_by=Plane(origin=(-34.9845202296, 28.9355418232, 0), x_dir=(0, 0, 1), z_dir=(0.7705799894, -0.6373432983, 0)), keep=Keep.TOP)

    split(bisect_by=Plane(origin=(0, 4.5467421163, 20.9913990025), x_dir=(1, 0, 0), z_dir=(0, 0.2116913388, 0.9773365731)), keep=Keep.TOP)


with BuildPart() as f1_11:
    add(f1_10.part)

    # F18_t72: cut F18_tool73
    add(f18_tool73.part, mode=Mode.SUBTRACT)


with BuildPart() as f18_tool79:
    # F18_s80 → F18_t81 (new body)
    with BuildSketch(Plane.XZ.offset(-35.6432670365)):
        with BuildLine():
            ThreePointArc((23, 25), (24.4142135624, 24.4142135624), (25, 23))
            Line((25, 23), (25, 25))
            Line((25, 25), (23, 25))
        make_face()
    extrude(amount=-F18_T81_DEPTH)

    split(bisect_by=Plane(origin=(-9.2266829073, 30.1791199472, 0), x_dir=(0, 0, 1), z_dir=(-0.2923717047, 0.956304756, 0)), keep=Keep.TOP)

    split(bisect_by=Plane(origin=(-34.9845202296, 28.9355418232, 0), x_dir=(0, 0, 1), z_dir=(0.7705799894, -0.6373432983, 0)), keep=Keep.TOP)


with BuildPart() as f1_12:
    add(f1_11.part)

    # F18_t78: cut F18_tool79
    add(f18_tool79.part, mode=Mode.SUBTRACT)


with BuildPart() as f18_tool85:
    # F18_s86 → F18_t87 (new body)
    with BuildSketch(Plane.XZ.offset(-106.4598330308)):
        with BuildLine():
            ThreePointArc((0, 2), (0.5857864376, 0.5857864376), (2, 0))
            Line((2, 0), (0, 0))
            Line((0, 0), (0, 2))
        make_face()
    extrude(amount=F18_T87_DEPTH)

    split(bisect_by=Plane(origin=(49.8293582326, 41.2136416249, 0), x_dir=(0, 0, 1), z_dir=(0.7705799894, 0.6373432983, 0)), keep=Keep.TOP)

    split(bisect_by=Plane(origin=(0, 4.5467421163, 20.9913990025), x_dir=(1, 0, 0), z_dir=(0, -0.2116913388, -0.9773365731)), keep=Keep.TOP)


with BuildPart() as f1_13:
    add(f1_12.part)

    # F18_t84: cut F18_tool85
    add(f18_tool85.part, mode=Mode.SUBTRACT)


with BuildPart() as f18_tool91:
    # F18_s92 → F18_t93 (new body)
    with BuildSketch(Plane.XZ.offset(-106.4598330308)):
        with BuildLine():
            ThreePointArc((0, 2), (0.5857864376, 0.5857864376), (2, 0))
            Line((2, 0), (0, 0))
            Line((0, 0), (0, 2))
        make_face()
    extrude(amount=F18_T93_DEPTH)

    split(bisect_by=Plane(origin=(49.8293582326, 41.2136416249, 0), x_dir=(0, 0, 1), z_dir=(-0.7705799894, -0.6373432983, 0)), keep=Keep.TOP)

    split(bisect_by=Plane(origin=(0, 4.5467421163, 20.9913990025), x_dir=(1, 0, 0), z_dir=(0, 0.2116913388, 0.9773365731)), keep=Keep.TOP)


with BuildPart() as f1_14:
    add(f1_13.part)

    # F18_t90: cut F18_tool91
    add(f18_tool91.part, mode=Mode.SUBTRACT)


with BuildPart() as f18_tool97:
    # F18_s98 → F18_t99 (new body)
    with BuildSketch(Plane.XZ.offset(-106.4598330308)):
        with BuildLine():
            ThreePointArc((0, 2), (0.5857864376, 0.5857864376), (2, 0))
            Line((2, 0), (0, 0))
            Line((0, 0), (0, 2))
        make_face()
    extrude(amount=F18_T99_DEPTH)

    split(bisect_by=Plane(origin=(-9.2266829073, 30.1791199472, 0), x_dir=(0, 0, 1), z_dir=(-0.2923717047, 0.956304756, 0)), keep=Keep.TOP)

    split(bisect_by=Plane(origin=(49.8293582326, 41.2136416249, 0), x_dir=(0, 0, 1), z_dir=(-0.7705799894, -0.6373432983, 0)), keep=Keep.TOP)

    split(bisect_by=Plane(origin=(0, 4.5467421163, 20.9913990025), x_dir=(1, 0, 0), z_dir=(0, -0.2116913388, -0.9773365731)), keep=Keep.TOP)


with BuildPart() as f1_15:
    add(f1_14.part)

    # F18_t96: cut F18_tool97
    add(f18_tool97.part, mode=Mode.SUBTRACT)


with BuildPart() as f18_tool104:
    # F18_s105 → F18_t106 (new body)
    with BuildSketch(Plane.XZ.offset(-106.4598330308)):
        with BuildLine():
            ThreePointArc((2, 25), (0.5857864376, 24.4142135624), (0, 23))
            Line((0, 23), (0, 25))
            Line((0, 25), (2, 25))
        make_face()
    extrude(amount=F18_T106_DEPTH)

    split(bisect_by=Plane(origin=(-9.2266829073, 30.1791199472, 0), x_dir=(0, 0, 1), z_dir=(-0.2923717047, 0.956304756, 0)), keep=Keep.TOP)

    split(bisect_by=Plane(origin=(49.8293582326, 41.2136416249, 0), x_dir=(0, 0, 1), z_dir=(-0.7705799894, -0.6373432983, 0)), keep=Keep.TOP)


with BuildPart() as f1_16:
    add(f1_15.part)

    # F18_t103: cut F18_tool104
    add(f18_tool104.part, mode=Mode.SUBTRACT)


with BuildPart() as f18_tool110:
    # F18_s111 → F18_t112 (new body)
    with BuildSketch(Plane.XZ.offset(-182)):
        with BuildLine():
            ThreePointArc((0, 2), (0.5857864376, 0.5857864376), (2, 0))
            Line((2, 0), (0, 0))
            Line((0, 0), (0, 2))
        make_face()
    extrude(amount=F18_T112_DEPTH)

    split(bisect_by=Plane(origin=(-27.8614600507, 131.0778638485, 0), x_dir=(0, 0, 1), z_dir=(-0.2079116908, 0.9781476007, 0)), keep=Keep.TOP)


with BuildPart() as f1_17:
    add(f1_16.part)

    # F18_t109: cut F18_tool110
    add(f18_tool110.part, mode=Mode.SUBTRACT)


with BuildPart() as f18_tool115:
    # F18_s116 → F18_t117 (new body)
    with BuildSketch(Plane.XZ.offset(-182)):
        with BuildLine():
            ThreePointArc((2, 25), (0.5857864376, 24.4142135624), (0, 23))
            Line((0, 23), (0, 25))
            Line((0, 25), (2, 25))
        make_face()
    extrude(amount=F18_T117_DEPTH)

    split(bisect_by=Plane(origin=(-27.8614600507, 131.0778638485, 0), x_dir=(0, 0, 1), z_dir=(-0.2079116908, 0.9781476007, 0)), keep=Keep.TOP)


with BuildPart() as f1_18:
    add(f1_17.part)

    # F18_t114: cut F18_tool115
    add(f18_tool115.part, mode=Mode.SUBTRACT)


with BuildPart() as f18_tool120:
    # F18_s121 → F18_t122 (new body)
    with BuildSketch(Plane.XZ.offset(-137.3139140418)):
        with BuildLine():
            ThreePointArc((23, 25), (24.4142135624, 24.4142135624), (25, 23))
            Line((25, 23), (25, 25))
            Line((25, 25), (23, 25))
        make_face()
    extrude(amount=-F18_T122_DEPTH)

    split(bisect_by=Plane(origin=(-27.8614600507, 131.0778638485, 0), x_dir=(0, 0, 1), z_dir=(-0.2079116908, 0.9781476007, 0)), keep=Keep.TOP)


with BuildPart() as f1_19:
    add(f1_18.part)

    # F18_t119: cut F18_tool120
    add(f18_tool120.part, mode=Mode.SUBTRACT)


with BuildPart() as f18_tool125:
    # F18_s126 → F18_t127 (new body)
    with BuildSketch(Plane.XZ.offset(-137.3139140418)):
        with BuildLine():
            ThreePointArc((25, 2), (24.4142135624, 0.5857864376), (23, 0))
            Line((23, 0), (25, 0))
            Line((25, 0), (25, 2))
        make_face()
    extrude(amount=-F18_T127_DEPTH)

    split(bisect_by=Plane(origin=(-27.8614600507, 131.0778638485, 0), x_dir=(0, 0, 1), z_dir=(-0.2079116908, 0.9781476007, 0)), keep=Keep.TOP)


with BuildPart() as f1_20:
    add(f1_19.part)

    # F18_t124: cut F18_tool125
    add(f18_tool125.part, mode=Mode.SUBTRACT)


with BuildPart() as f18_tool131:
    # F18_s132 → F18_t133 (new body)
    with BuildSketch(Plane.XZ.offset(-35.6432670365)):
        with BuildLine():
            ThreePointArc((23, 25), (24.4142135624, 24.4142135624), (25, 23))
            Line((25, 23), (25, 25))
            Line((25, 25), (23, 25))
        make_face()
    extrude(amount=-F18_T133_DEPTH)

    split(bisect_by=Plane(origin=(-34.9845202296, 28.9355418232, 0), x_dir=(0, 0, 1), z_dir=(-0.7705799894, 0.6373432983, 0)), keep=Keep.TOP)


with BuildPart() as f18_tool135:
    # F18_s136 → F18_t137 (new body)
    with BuildSketch(Plane(origin=(56.7978037382, 68.6713912604, 0), x_dir=(0, 0, 1), z_dir=(0.6373432983, 0.7705799894, 0))):
        with BuildLine():
            ThreePointArc((25, -47.4002448925), (24.4142135624, -45.9860313302), (23, -45.4002448925))
            Line((23, -45.4002448925), (25, -45.4002448925))
            Line((25, -45.4002448925), (25, -47.4002448925))
        make_face()
    extrude(amount=F18_T137_DEPTH)

    split(bisect_by=Plane.YZ.offset(25), keep=Keep.BOTTOM)


with BuildPart() as f18_tool131_1:
    add(f18_tool131.part)

    # F18_t139: intersect F18_tool135
    add(f18_tool135.part, mode=Mode.INTERSECT)


with BuildPart() as f1_21:
    add(f1_20.part)

    # F18_t129: cut F18_tool131
    add(f18_tool131_1.part, mode=Mode.SUBTRACT)


with BuildPart() as f18_tool142:
    # F18_s143 → F18_t144 (new body)
    with BuildSketch(Plane.XZ.offset(-35.6432670365)):
        with BuildLine():
            ThreePointArc((25, 2), (24.4142135624, 0.5857864376), (23, 0))
            Line((23, 0), (25, 0))
            Line((25, 0), (25, 2))
        make_face()
    extrude(amount=-F18_T144_DEPTH)

    split(bisect_by=Plane(origin=(-34.9845202296, 28.9355418232, 0), x_dir=(0, 0, 1), z_dir=(-0.7705799894, 0.6373432983, 0)), keep=Keep.TOP)

    split(bisect_by=Plane(origin=(0, 4.5467421163, 20.9913990025), x_dir=(1, 0, 0), z_dir=(0, 0.2116913388, 0.9773365731)), keep=Keep.TOP)


with BuildPart() as f18_tool147:
    # F18_s148 → F18_t149 (new body)
    with BuildSketch(Plane(origin=(55.6145080943, 67.2407275237, -14.5643578937), x_dir=(-0.7705799894, 0.6373432983, 0), z_dir=(0.6286469564, 0.7600656763, -0.1646304099))):
        with BuildLine():
            ThreePointArc((45.4002448925, 17.2405635017), (45.8936460368, 15.9252080791), (47.1304047803, 15.258850527))
            Line((47.1304047803, 15.258850527), (45.4002448925, 15.4944378922))
            Line((45.4002448925, 15.4944378922), (45.4002448925, 17.2405635017))
        make_face()
    extrude(amount=F18_T149_DEPTH)

    split(bisect_by=Plane.YZ.offset(25), keep=Keep.BOTTOM)

    split(bisect_by=Plane.XY, keep=Keep.TOP)


with BuildPart() as f18_tool142_1:
    add(f18_tool142.part)

    # F18_t152: intersect F18_tool147
    add(f18_tool147.part, mode=Mode.INTERSECT)


with BuildPart() as f1_22:
    add(f1_21.part)

    # F18_t140: cut F18_tool142
    add(f18_tool142_1.part, mode=Mode.SUBTRACT)


with BuildPart() as f18_tool155:
    # F18_s156 → F18_t157 (new body)
    with BuildSketch(Plane(origin=(-76.2230659478, 92.1575068097, -19.9613383317), x_dir=(0.7705799894, 0.6373432983, 0), z_dir=(0.6286469564, -0.7600656763, 0.1646304099))):
        with BuildLine():
            ThreePointArc((64.6647446284, 14.617411291), (65.1581457726, 13.3020558683), (66.3949045162, 12.6356983163))
            Line((66.3949045162, 12.6356983163), (64.6647446284, 12.8712856815))
            Line((64.6647446284, 12.8712856815), (64.6647446284, 14.617411291))
        make_face()
    extrude(amount=F18_T157_DEPTH)

    split(bisect_by=Plane.YZ, keep=Keep.TOP)

    split(bisect_by=Plane.XY, keep=Keep.TOP)


with BuildPart() as f18_tool160:
    # F18_s161 → F18_t162 (new body)
    with BuildSketch(Plane.XZ.offset(-106.4598330308)):
        with BuildLine():
            ThreePointArc((0, 2), (0.5857864376, 0.5857864376), (2, 0))
            Line((2, 0), (0, 0))
            Line((0, 0), (0, 2))
        make_face()
    extrude(amount=F18_T162_DEPTH)

    split(bisect_by=Plane(origin=(49.8293582326, 41.2136416249, 0), x_dir=(0, 0, 1), z_dir=(0.7705799894, 0.6373432983, 0)), keep=Keep.TOP)

    split(bisect_by=Plane(origin=(0, 4.5467421163, 20.9913990025), x_dir=(1, 0, 0), z_dir=(0, 0.2116913388, 0.9773365731)), keep=Keep.TOP)


with BuildPart() as f18_tool155_1:
    add(f18_tool155.part)

    # F18_t165: intersect F18_tool160
    add(f18_tool160.part, mode=Mode.INTERSECT)


with BuildPart() as f1_23:
    add(f1_22.part)

    # F18_t153: cut F18_tool155
    add(f18_tool155_1.part, mode=Mode.SUBTRACT)


with BuildPart() as f18_tool168:
    # F18_s169 → F18_t170 (new body)
    with BuildSketch(Plane(origin=(-78.016074724, 94.3253442805, 0), x_dir=(0, 0, 1), z_dir=(0.6373432983, -0.7705799894, 0))):
        with BuildLine():
            ThreePointArc((25, -66.6647446284), (24.4142135624, -65.250531066), (23, -64.6647446284))
            Line((23, -64.6647446284), (25, -64.6647446284))
            Line((25, -64.6647446284), (25, -66.6647446284))
        make_face()
    extrude(amount=F18_T170_DEPTH)

    split(bisect_by=Plane.YZ, keep=Keep.TOP)


with BuildPart() as f18_tool172:
    # F18_s173 → F18_t174 (new body)
    with BuildSketch(Plane.XZ.offset(-106.4598330308)):
        with BuildLine():
            ThreePointArc((2, 25), (0.5857864376, 24.4142135624), (0, 23))
            Line((0, 23), (0, 25))
            Line((0, 25), (2, 25))
        make_face()
    extrude(amount=F18_T174_DEPTH)

    split(bisect_by=Plane(origin=(49.8293582326, 41.2136416249, 0), x_dir=(0, 0, 1), z_dir=(0.7705799894, 0.6373432983, 0)), keep=Keep.TOP)


with BuildPart() as f18_tool168_1:
    add(f18_tool168.part)

    # F18_t176: intersect F18_tool172
    add(f18_tool172.part, mode=Mode.INTERSECT)


with BuildPart() as f1_24:
    add(f1_23.part)

    # F18_t166: cut F18_tool168
    add(f18_tool168_1.part, mode=Mode.SUBTRACT)


solid = f1_24.part
